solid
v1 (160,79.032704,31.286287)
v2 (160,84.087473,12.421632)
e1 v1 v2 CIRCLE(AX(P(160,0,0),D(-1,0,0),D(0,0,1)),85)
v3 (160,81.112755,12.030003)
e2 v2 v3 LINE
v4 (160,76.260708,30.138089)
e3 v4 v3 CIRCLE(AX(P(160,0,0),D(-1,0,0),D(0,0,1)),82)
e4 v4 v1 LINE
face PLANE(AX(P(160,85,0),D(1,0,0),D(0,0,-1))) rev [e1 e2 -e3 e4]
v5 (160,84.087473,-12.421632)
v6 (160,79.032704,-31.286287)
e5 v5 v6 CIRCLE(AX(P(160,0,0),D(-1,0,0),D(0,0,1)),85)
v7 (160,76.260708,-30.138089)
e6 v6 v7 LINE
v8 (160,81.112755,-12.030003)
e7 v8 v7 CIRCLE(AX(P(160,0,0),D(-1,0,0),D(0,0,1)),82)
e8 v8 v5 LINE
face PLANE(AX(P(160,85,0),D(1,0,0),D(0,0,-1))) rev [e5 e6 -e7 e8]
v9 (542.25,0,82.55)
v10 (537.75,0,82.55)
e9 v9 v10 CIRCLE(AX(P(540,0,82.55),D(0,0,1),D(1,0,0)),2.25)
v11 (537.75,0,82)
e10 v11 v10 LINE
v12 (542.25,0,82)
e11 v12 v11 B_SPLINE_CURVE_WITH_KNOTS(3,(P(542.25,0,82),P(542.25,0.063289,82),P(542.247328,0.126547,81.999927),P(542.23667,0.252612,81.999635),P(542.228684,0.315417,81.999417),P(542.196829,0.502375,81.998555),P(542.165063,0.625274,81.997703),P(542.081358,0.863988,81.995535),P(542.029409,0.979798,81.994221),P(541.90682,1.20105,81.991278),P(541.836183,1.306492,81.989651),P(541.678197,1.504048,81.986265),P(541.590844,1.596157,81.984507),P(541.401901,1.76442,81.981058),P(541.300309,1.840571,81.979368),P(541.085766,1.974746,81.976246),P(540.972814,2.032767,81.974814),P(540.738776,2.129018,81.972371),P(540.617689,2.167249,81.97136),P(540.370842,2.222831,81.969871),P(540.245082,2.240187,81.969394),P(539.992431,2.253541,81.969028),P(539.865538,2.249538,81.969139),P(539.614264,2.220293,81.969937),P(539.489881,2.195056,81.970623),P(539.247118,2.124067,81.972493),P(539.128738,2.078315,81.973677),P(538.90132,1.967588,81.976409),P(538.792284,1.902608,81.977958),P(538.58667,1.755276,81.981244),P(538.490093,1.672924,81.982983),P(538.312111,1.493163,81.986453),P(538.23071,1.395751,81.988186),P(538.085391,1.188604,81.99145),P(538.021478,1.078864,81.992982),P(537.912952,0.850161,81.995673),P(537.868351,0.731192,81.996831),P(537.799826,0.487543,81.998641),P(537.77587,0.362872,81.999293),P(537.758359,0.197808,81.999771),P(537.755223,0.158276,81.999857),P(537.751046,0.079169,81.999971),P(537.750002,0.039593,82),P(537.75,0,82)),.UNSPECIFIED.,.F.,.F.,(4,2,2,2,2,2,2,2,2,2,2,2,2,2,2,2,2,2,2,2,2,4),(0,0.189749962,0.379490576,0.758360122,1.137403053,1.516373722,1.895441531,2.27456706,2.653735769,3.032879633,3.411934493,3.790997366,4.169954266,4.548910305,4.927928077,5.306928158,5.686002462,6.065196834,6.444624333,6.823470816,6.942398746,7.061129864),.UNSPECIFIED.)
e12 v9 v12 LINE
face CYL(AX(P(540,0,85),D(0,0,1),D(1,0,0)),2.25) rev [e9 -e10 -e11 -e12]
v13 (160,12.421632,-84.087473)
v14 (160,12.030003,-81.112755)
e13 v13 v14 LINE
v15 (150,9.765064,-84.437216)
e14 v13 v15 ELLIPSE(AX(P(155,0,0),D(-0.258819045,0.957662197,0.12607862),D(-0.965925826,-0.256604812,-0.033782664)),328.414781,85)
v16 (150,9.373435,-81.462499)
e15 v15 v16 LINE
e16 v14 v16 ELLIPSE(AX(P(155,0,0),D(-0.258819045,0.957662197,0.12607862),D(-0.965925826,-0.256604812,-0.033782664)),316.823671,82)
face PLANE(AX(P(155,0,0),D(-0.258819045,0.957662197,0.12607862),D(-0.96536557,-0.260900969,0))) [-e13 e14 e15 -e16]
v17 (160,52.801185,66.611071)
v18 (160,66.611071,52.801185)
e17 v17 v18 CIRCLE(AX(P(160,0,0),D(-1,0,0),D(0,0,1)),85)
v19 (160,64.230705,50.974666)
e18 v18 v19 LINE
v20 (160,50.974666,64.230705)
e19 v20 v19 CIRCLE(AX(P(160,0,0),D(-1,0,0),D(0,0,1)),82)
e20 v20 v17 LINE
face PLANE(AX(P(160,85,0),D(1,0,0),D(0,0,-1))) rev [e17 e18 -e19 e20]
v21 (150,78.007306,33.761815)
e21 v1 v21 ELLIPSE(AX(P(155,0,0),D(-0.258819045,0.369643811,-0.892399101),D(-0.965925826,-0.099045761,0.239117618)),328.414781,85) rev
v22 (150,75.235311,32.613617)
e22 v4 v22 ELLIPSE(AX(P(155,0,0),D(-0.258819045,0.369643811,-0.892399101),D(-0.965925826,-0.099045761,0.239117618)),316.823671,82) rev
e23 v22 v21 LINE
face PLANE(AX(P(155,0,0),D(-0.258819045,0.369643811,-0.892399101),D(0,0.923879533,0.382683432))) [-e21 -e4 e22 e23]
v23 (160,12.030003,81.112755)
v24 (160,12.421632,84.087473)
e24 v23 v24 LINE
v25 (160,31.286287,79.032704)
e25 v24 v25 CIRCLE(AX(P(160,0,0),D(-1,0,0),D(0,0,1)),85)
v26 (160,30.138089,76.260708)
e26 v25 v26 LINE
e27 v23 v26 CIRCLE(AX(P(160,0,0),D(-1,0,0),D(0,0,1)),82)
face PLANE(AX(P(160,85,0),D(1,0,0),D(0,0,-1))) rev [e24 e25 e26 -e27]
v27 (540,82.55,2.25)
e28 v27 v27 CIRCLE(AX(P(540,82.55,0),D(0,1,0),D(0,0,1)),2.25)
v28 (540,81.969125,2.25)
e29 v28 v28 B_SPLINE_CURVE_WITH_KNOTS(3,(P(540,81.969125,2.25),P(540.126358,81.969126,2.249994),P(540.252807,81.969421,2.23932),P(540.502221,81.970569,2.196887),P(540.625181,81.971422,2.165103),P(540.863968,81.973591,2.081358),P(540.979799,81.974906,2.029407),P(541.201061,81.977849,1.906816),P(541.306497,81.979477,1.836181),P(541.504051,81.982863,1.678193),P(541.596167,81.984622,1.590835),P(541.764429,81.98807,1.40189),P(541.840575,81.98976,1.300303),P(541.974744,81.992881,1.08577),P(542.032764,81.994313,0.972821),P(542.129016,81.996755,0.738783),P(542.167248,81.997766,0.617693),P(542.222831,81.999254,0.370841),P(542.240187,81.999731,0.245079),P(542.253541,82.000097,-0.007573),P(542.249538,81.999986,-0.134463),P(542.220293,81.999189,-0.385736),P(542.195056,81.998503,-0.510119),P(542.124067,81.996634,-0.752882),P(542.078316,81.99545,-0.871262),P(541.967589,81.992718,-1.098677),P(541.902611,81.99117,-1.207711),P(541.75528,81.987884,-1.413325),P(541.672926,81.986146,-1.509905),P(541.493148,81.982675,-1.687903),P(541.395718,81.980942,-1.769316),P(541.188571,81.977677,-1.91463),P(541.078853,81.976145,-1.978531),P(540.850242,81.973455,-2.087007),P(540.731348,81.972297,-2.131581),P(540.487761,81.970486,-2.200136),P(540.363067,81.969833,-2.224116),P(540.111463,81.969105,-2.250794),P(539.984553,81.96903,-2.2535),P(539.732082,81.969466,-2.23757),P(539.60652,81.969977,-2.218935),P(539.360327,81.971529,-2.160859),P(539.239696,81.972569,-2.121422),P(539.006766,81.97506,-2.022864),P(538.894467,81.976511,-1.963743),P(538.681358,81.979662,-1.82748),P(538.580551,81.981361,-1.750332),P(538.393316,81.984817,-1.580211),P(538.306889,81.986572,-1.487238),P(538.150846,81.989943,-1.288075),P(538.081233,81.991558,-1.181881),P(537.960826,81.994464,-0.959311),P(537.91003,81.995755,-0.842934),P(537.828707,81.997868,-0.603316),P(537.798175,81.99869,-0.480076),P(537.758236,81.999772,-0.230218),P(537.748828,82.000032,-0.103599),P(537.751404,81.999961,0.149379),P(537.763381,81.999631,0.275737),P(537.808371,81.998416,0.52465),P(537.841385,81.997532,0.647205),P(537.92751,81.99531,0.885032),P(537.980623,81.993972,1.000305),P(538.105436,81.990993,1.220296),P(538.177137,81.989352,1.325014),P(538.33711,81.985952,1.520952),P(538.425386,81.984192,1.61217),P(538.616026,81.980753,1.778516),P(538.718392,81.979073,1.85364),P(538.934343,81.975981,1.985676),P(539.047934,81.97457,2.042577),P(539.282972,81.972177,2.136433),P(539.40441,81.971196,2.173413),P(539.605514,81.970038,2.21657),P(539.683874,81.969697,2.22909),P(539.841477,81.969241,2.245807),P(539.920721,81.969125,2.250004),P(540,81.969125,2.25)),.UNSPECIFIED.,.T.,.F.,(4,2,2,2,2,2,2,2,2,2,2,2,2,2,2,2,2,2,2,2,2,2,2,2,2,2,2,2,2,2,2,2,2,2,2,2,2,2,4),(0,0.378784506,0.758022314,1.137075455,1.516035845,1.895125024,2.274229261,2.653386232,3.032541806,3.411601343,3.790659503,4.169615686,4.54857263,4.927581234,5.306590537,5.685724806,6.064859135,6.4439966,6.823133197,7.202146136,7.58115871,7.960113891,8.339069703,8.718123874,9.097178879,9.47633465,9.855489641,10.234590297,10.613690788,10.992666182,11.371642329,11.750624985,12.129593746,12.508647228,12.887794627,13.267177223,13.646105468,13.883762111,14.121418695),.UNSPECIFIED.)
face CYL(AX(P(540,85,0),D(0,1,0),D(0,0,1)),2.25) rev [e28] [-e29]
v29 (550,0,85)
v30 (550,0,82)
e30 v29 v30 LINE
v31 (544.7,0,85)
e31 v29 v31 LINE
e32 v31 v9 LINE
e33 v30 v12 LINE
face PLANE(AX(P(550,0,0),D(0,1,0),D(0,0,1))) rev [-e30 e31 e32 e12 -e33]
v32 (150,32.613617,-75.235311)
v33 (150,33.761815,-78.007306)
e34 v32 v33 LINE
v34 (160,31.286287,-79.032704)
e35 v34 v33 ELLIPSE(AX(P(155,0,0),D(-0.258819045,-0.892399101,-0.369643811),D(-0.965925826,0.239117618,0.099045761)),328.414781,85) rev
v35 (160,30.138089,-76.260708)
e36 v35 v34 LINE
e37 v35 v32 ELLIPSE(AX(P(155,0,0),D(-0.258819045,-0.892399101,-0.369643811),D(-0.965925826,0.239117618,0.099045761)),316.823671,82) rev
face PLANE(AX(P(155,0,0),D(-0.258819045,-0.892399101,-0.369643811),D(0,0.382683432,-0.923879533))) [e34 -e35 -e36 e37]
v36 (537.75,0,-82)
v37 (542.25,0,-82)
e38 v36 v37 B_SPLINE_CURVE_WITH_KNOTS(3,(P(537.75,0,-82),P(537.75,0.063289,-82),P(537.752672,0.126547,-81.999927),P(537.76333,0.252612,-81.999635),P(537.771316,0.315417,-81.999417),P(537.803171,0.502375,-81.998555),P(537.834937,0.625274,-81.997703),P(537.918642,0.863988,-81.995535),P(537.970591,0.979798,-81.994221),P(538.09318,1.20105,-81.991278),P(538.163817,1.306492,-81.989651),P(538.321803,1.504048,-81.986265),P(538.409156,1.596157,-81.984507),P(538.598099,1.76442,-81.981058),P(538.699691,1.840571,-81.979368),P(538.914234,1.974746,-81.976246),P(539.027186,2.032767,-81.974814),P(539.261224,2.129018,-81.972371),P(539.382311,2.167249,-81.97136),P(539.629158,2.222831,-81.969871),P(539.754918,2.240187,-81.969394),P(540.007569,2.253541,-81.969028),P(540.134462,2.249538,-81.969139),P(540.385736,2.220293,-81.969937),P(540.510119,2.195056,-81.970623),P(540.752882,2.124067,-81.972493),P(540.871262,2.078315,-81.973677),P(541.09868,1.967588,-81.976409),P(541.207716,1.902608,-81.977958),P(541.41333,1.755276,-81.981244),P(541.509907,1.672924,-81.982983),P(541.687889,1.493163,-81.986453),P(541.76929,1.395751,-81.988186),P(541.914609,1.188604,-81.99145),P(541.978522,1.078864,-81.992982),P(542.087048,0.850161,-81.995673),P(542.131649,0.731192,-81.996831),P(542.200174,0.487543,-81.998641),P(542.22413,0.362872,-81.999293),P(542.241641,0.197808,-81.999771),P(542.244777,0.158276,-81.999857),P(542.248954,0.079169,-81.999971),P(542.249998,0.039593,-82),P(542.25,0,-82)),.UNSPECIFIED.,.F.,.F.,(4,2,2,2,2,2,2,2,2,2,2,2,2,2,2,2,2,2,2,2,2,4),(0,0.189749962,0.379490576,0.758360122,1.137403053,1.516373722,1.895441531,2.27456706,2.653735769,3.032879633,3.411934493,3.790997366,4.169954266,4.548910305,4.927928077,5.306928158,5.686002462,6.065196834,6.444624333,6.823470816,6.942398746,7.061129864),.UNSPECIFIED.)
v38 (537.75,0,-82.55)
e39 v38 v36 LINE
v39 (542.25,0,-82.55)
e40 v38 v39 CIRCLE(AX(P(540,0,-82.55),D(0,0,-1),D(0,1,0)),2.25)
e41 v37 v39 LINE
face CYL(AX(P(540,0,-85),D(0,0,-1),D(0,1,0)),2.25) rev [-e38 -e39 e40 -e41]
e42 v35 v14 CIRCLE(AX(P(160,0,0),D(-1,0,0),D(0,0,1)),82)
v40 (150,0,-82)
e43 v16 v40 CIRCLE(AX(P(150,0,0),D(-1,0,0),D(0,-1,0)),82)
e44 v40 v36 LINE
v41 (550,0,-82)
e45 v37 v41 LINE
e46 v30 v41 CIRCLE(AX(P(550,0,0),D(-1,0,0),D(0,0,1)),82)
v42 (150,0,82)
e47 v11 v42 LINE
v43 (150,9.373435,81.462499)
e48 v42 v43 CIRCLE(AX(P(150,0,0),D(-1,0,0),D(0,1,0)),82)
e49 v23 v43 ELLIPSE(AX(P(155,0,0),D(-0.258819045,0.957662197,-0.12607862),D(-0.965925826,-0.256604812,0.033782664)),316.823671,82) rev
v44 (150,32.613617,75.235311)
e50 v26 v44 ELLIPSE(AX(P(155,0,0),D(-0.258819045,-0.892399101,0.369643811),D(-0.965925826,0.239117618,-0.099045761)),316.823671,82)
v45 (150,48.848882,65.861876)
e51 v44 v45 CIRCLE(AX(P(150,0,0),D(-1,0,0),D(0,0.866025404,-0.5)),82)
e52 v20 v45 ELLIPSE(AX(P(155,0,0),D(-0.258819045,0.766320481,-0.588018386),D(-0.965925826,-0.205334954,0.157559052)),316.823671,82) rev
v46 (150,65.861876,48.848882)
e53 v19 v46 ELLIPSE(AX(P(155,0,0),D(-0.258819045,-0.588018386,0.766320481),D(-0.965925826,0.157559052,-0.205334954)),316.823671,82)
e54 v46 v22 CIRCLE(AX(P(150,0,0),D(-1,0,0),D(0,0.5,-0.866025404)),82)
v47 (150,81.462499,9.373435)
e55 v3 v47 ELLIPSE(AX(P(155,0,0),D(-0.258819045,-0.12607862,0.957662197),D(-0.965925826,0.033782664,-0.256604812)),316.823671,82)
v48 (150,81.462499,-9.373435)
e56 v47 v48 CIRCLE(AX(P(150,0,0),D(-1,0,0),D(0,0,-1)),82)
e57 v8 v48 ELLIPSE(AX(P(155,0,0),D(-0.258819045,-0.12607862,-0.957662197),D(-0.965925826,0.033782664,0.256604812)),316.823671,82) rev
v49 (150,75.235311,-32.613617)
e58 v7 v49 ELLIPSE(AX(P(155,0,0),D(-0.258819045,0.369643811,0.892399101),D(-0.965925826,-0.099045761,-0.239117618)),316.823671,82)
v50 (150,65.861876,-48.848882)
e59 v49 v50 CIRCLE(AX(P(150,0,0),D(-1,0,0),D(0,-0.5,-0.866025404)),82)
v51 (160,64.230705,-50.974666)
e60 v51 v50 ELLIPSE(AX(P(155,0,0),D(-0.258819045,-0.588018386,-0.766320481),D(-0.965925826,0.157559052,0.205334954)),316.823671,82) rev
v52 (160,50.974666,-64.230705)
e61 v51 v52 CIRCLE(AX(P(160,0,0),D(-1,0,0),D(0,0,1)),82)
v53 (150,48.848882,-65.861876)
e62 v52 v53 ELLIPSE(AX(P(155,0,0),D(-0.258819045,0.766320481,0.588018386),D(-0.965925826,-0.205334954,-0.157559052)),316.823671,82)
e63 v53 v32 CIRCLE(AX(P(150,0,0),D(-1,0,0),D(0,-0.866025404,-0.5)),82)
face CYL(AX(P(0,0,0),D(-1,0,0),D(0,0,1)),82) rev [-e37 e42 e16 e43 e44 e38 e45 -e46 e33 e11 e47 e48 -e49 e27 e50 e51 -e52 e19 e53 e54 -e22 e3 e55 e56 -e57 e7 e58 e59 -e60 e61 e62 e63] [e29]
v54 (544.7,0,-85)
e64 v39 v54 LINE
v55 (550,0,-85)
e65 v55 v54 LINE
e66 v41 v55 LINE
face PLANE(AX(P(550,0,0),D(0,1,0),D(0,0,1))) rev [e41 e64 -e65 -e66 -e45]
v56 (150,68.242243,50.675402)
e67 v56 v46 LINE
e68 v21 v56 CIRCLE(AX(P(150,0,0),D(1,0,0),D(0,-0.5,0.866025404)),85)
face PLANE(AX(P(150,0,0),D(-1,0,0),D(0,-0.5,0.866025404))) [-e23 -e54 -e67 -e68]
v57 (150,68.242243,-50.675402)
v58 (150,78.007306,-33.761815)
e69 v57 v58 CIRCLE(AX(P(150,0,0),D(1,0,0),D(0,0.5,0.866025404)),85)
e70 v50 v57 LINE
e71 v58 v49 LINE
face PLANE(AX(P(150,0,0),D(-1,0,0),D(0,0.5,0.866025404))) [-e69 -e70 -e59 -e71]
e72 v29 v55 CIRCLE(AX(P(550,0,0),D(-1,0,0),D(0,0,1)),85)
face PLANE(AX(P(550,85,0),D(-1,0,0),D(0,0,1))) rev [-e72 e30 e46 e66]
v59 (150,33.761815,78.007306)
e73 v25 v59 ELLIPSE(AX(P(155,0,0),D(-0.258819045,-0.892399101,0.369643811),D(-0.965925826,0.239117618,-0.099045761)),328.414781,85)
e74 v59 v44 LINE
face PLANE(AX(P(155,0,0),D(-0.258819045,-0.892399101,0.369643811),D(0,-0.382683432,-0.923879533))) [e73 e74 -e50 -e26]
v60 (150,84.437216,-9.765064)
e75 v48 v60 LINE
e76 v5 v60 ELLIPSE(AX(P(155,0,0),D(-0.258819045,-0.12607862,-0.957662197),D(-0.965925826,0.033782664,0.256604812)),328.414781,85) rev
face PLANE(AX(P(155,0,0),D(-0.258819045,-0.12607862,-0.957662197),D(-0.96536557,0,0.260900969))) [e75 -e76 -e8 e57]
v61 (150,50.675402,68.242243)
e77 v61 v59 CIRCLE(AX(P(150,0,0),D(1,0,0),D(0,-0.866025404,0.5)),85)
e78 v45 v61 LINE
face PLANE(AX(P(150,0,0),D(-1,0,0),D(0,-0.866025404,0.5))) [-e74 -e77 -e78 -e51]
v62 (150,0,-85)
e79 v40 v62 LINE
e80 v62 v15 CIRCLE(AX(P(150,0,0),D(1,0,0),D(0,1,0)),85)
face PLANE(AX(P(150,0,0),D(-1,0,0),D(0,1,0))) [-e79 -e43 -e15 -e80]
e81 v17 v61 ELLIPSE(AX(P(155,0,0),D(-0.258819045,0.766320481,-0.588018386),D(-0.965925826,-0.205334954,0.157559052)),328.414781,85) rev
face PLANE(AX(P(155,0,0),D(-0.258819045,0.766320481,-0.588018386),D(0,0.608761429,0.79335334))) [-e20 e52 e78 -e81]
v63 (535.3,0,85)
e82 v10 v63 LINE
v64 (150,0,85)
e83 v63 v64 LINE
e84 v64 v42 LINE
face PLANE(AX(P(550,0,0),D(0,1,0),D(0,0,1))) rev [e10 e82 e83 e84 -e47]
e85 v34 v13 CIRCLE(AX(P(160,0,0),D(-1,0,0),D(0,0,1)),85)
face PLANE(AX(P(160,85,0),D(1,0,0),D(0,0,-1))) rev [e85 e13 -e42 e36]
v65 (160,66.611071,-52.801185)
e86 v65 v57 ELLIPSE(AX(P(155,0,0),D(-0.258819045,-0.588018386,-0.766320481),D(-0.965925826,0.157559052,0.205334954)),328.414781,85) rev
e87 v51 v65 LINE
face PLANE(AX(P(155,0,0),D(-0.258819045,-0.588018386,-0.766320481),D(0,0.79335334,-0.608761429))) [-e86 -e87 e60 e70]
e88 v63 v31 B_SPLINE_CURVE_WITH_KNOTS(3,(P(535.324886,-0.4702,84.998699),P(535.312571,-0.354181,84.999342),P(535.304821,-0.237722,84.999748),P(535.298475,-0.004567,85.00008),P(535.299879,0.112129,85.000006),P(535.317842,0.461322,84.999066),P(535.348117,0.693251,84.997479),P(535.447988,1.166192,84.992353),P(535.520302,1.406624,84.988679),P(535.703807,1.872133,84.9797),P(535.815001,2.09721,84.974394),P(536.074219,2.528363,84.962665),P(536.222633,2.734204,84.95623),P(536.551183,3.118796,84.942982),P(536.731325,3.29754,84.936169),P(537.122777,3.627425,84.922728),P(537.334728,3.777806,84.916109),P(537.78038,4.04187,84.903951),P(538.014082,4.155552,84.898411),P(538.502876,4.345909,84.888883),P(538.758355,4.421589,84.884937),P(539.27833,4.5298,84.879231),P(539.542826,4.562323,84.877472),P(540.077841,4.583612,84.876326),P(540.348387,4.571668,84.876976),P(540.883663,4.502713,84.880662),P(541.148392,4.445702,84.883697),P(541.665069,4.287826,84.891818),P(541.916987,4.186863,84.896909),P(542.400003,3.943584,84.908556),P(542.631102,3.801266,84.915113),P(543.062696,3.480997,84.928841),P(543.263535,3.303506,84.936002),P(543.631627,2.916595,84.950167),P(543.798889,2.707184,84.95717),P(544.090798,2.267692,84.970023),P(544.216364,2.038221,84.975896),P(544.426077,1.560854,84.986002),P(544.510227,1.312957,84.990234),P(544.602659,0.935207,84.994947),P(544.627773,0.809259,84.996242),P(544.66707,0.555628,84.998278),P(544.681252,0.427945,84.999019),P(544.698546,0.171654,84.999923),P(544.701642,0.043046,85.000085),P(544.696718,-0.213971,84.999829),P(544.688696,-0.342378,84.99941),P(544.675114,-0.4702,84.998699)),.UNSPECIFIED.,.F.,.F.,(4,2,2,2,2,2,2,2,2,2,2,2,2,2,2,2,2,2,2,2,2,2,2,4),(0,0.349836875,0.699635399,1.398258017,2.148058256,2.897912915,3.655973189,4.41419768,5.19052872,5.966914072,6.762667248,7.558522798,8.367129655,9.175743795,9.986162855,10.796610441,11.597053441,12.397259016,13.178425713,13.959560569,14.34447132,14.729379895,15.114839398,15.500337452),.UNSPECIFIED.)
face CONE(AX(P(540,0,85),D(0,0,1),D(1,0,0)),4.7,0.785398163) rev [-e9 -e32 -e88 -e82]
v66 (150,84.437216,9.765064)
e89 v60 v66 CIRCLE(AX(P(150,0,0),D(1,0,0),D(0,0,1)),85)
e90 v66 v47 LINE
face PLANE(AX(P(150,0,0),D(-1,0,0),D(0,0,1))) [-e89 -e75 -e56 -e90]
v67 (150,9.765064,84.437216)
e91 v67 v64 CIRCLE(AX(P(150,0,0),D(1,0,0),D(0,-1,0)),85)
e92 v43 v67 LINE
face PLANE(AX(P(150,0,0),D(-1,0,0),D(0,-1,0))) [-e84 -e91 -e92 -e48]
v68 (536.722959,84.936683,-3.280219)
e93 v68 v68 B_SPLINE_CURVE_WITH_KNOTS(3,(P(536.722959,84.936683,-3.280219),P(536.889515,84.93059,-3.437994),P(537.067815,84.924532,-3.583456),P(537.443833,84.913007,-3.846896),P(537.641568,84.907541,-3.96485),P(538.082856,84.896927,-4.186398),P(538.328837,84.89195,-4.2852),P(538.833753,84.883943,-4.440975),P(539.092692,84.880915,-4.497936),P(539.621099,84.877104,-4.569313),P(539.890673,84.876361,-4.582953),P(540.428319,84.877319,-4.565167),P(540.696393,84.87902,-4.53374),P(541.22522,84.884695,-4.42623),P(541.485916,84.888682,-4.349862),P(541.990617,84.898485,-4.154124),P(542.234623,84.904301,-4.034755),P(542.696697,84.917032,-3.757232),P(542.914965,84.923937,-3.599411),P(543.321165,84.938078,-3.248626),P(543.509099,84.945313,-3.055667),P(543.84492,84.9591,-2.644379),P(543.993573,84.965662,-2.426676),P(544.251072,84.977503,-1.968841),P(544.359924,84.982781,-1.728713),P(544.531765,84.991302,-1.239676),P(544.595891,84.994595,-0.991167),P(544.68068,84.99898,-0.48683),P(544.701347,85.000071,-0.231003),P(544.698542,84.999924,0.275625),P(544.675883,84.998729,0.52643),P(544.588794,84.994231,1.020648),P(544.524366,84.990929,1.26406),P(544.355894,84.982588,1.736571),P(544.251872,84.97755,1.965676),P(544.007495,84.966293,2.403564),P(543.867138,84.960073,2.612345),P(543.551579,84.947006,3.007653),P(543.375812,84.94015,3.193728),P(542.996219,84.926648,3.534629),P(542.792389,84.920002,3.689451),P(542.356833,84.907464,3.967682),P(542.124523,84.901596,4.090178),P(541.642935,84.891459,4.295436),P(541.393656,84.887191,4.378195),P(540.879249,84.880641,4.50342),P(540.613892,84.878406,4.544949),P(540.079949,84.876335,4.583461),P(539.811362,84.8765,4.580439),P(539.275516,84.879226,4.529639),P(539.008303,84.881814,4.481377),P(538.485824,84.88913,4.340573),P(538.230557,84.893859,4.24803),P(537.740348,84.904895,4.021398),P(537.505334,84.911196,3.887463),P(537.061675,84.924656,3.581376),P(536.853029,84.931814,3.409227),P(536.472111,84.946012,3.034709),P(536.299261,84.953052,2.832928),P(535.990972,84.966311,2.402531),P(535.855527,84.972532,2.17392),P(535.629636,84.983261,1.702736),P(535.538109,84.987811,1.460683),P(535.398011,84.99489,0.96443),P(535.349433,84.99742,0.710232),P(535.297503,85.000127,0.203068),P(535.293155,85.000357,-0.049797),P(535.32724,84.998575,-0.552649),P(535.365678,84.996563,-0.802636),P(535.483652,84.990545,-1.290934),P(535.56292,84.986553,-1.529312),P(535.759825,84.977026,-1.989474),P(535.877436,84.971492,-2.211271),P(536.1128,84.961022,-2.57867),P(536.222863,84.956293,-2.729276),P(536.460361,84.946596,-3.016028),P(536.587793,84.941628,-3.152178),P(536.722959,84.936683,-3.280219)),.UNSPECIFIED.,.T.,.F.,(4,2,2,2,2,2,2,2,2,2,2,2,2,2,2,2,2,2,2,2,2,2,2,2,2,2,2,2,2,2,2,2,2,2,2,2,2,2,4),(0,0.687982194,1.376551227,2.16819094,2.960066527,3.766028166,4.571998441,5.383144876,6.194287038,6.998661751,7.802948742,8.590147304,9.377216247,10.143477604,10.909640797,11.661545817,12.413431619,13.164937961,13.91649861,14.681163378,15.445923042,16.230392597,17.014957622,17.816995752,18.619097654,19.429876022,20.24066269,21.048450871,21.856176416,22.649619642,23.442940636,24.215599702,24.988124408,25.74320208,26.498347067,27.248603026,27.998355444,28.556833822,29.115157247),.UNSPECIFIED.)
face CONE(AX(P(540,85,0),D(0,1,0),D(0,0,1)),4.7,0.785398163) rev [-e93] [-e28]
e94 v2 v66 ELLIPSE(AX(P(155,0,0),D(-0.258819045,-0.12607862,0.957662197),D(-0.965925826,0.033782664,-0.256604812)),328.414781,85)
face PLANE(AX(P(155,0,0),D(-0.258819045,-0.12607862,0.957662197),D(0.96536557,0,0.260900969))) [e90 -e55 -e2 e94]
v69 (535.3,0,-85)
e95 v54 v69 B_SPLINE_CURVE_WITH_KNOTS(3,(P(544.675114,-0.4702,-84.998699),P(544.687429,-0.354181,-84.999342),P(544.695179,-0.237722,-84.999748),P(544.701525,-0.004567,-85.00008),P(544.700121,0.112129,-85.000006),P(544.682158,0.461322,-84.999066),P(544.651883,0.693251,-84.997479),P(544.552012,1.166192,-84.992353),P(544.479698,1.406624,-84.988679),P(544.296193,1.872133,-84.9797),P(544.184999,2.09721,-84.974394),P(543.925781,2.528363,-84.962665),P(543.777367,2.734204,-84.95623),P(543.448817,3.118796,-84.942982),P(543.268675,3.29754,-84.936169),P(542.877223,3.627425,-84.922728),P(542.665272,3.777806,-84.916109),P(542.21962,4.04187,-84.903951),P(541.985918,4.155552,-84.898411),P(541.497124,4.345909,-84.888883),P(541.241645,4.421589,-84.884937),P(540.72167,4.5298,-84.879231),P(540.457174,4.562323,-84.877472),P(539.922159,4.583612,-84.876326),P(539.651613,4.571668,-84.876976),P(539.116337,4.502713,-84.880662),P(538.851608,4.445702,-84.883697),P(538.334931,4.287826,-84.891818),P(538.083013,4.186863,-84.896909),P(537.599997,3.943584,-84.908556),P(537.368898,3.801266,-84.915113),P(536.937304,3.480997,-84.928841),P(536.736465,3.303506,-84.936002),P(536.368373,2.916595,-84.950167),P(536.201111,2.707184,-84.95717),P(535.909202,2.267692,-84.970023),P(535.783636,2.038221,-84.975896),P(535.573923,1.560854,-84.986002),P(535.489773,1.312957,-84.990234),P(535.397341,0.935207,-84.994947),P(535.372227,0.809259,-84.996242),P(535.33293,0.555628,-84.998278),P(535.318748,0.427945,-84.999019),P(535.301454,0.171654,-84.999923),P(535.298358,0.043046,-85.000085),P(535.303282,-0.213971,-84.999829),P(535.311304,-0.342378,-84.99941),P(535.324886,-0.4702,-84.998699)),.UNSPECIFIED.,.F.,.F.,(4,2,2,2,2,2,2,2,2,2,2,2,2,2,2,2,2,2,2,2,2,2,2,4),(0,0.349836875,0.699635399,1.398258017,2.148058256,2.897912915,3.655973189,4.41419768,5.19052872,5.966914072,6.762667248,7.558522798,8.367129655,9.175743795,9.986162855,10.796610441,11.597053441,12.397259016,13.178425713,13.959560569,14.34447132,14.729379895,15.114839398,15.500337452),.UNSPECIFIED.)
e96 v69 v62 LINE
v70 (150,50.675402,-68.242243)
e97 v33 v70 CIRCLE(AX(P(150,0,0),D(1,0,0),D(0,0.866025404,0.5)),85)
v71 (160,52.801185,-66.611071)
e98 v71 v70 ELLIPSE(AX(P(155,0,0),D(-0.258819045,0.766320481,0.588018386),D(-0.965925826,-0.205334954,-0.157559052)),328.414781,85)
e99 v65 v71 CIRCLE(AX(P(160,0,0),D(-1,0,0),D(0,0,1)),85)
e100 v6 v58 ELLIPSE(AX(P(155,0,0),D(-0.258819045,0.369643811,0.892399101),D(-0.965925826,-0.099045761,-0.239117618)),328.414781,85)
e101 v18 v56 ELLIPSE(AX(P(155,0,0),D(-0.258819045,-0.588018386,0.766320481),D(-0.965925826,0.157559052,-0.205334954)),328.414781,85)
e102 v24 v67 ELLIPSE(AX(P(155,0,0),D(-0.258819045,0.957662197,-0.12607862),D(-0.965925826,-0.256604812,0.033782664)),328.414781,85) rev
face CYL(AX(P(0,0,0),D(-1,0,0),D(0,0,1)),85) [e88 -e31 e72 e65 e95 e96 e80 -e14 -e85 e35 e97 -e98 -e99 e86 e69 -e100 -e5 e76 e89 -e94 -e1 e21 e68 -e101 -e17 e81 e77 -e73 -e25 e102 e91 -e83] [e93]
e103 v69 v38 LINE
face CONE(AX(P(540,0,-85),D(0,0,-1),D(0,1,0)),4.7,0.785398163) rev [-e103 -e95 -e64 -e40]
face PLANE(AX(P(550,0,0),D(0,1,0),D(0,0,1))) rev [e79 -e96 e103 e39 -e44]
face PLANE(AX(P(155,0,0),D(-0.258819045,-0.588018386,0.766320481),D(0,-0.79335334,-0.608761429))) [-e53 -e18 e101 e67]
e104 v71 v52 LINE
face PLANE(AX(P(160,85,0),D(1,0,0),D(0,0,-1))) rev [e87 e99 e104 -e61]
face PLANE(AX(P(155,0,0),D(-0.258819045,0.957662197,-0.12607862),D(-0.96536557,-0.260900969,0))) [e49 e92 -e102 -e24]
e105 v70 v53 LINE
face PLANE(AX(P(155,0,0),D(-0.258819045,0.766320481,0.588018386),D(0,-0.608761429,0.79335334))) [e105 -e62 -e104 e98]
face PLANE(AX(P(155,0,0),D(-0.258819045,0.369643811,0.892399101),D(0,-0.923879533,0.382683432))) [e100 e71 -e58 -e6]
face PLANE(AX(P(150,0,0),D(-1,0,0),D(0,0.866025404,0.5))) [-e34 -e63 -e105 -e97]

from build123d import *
from build123d.topology import SkipClean

# Parameters (mm, degrees)
SKETCH1_W                      = 390
SKETCH1_H                      = 3
BOSS_EXTRUDE1_DEPTH            = 5
DRAFT1_ANGLE                   = -15
CIRPATTERN1_COUNT              = 12
DRAFT1_OF_CIRPATTERN1_2_ANGLE  = -15
DRAFT1_OF_CIRPATTERN1_3_ANGLE  = -15
DRAFT1_OF_CIRPATTERN1_4_ANGLE  = -15
DRAFT1_OF_CIRPATTERN1_5_ANGLE  = -15
DRAFT1_OF_CIRPATTERN1_6_ANGLE  = -15
DRAFT1_OF_CIRPATTERN1_7_ANGLE  = -15
DRAFT1_OF_CIRPATTERN1_8_ANGLE  = -15
DRAFT1_OF_CIRPATTERN1_9_ANGLE  = -15
DRAFT1_OF_CIRPATTERN1_10_ANGLE = -15
DRAFT1_OF_CIRPATTERN1_11_ANGLE = -15
DRAFT1_OF_CIRPATTERN1_12_ANGLE = -15
SKETCH3_OUTSIDE_W              = 265.338
SKETCH3_OUTSIDE_H              = 265.338
CUT_EXTRUDE1_DEPTH             = 563.983125857


# Read off the part's stored shape, not the designer's step: CSK for M4 Countersunk Flat Head Screw1
with BuildPart() as part:
    # Sketch1 → Revolve1 (revolve)
    with BuildSketch(Plane.XY, mode=Mode.PRIVATE) as revolve1_sk:
        with Locations((355, 83.5)):
            Rectangle(SKETCH1_W, SKETCH1_H)
    revolve(revolve1_sk.sketch.rotate(Axis((0, 0, 0), (1, 0, 0)), 90), axis=Axis((0, 0, 0), (1, 0, 0)))

    # Sketch2 → Boss-Extrude1 (add, symmetric)
    with BuildSketch(Plane(origin=(155, 0, 0), x_dir=(0, 0, -1), z_dir=(1, 0, 0))):
        with BuildLine():
            Line((10.703147762, 81.298478633), (11.094726339, 84.272813217))
            ThreePointArc((11.094726339, 84.272813217), (0, 85), (-11.094726339, 84.272813217))
            Line((-11.094726339, 84.272813217), (-10.703147762, 81.298478633))
            ThreePointArc((-10.703147762, 81.298478633), (0, 82), (10.703147762, 81.298478633))
        make_face()
    boss_extrude1 = extrude(amount=BOSS_EXTRUDE1_DEPTH, both=True)

    # Draft1
    draft1_faces = [part.faces().sort_by_distance(p)[0] for p in [
        (155, 82.785645925, 10.89893705),
        (155, 82.785645925, -10.89893705),
    ]]
    draft(draft1_faces, Plane(origin=(155, 0, 0), x_dir=(0, 0, 1), z_dir=(1, 0, 0)), DRAFT1_ANGLE)

    # CirPattern1: Boss-Extrude1 ×12 about axis
    with SkipClean():  # the faces are left unmerged after this step: merging them gives an invalid solid
        cirpattern1_axis = Axis((0, 0, 0), (1, 0, 0))
        for i in range(1, CIRPATTERN1_COUNT):
            add(boss_extrude1.rotate(cirpattern1_axis, i * 360 / CIRPATTERN1_COUNT))

    # Draft1 of CirPattern1 2
    draft1_of_cirpattern1_2_faces = [part.faces().sort_by_distance(p)[0] for p in [
        (155, 66.245003914, 50.831579322),
        (155, 77.143940965, 31.954066602),
    ]]
    draft(draft1_of_cirpattern1_2_faces, Plane(origin=(155, 0, 0), x_dir=(0, -0.49999999999999994, 0.8660254037844387), z_dir=(1, 0, 0)), DRAFT1_OF_CIRPATTERN1_2_ANGLE)

    # Draft1 of CirPattern1 3
    draft1_of_cirpattern1_3_faces = [part.faces().sort_by_distance(p)[0] for p in [
        (155, 31.954066602, 77.143940965),
        (155, 50.831579322, 66.245003914),
    ]]
    draft(draft1_of_cirpattern1_3_faces, Plane(origin=(155, 0, 0), x_dir=(0, -0.8660254037844386, 0.5000000000000001), z_dir=(1, 0, 0)), DRAFT1_OF_CIRPATTERN1_3_ANGLE)

    # Draft1 of CirPattern1 4
    draft1_of_cirpattern1_4_faces = [part.faces().sort_by_distance(p)[0] for p in [
        (155, -10.89893705, 82.785645925),
        (155, 10.89893705, 82.785645925),
    ]]
    draft(draft1_of_cirpattern1_4_faces, Plane(origin=(155, 0, 0), x_dir=(0, -1, 0), z_dir=(1, 0, 0)), DRAFT1_OF_CIRPATTERN1_4_ANGLE)

    # Draft1 of CirPattern1 5
    draft1_of_cirpattern1_5_faces = [part.faces().sort_by_distance(p)[0] for p in [
        (155, -50.831579322, 66.245003914),
        (155, -31.954066602, 77.143940965),
    ]]
    draft(draft1_of_cirpattern1_5_faces, Plane(origin=(155, 0, 0), x_dir=(0, -0.8660254037844387, -0.4999999999999998), z_dir=(1, 0, 0)), DRAFT1_OF_CIRPATTERN1_5_ANGLE)

    # Draft1 of CirPattern1 6
    draft1_of_cirpattern1_6_faces = [part.faces().sort_by_distance(p)[0] for p in [
        (155, -77.143940965, 31.954066602),
        (155, -66.245003914, 50.831579322),
    ]]
    draft(draft1_of_cirpattern1_6_faces, Plane(origin=(155, 0, 0), x_dir=(0, -0.49999999999999994, -0.8660254037844387), z_dir=(1, 0, 0)), DRAFT1_OF_CIRPATTERN1_6_ANGLE)

    # Draft1 of CirPattern1 7
    draft1_of_cirpattern1_7_faces = [part.faces().sort_by_distance(p)[0] for p in [
        (155, -82.785645925, -10.89893705),
        (155, -82.785645925, 10.89893705),
    ]]
    draft(draft1_of_cirpattern1_7_faces, Plane(origin=(155, 0, 0), x_dir=(0, 0, -1), z_dir=(1, 0, 0)), DRAFT1_OF_CIRPATTERN1_7_ANGLE)

    # Draft1 of CirPattern1 8
    draft1_of_cirpattern1_8_faces = [part.faces().sort_by_distance(p)[0] for p in [
        (155, -66.245003914, -50.831579322),
        (155, -77.143940965, -31.954066602),
    ]]
    draft(draft1_of_cirpattern1_8_faces, Plane(origin=(155, 0, 0), x_dir=(0, 0.5000000000000001, -0.8660254037844386), z_dir=(1, 0, 0)), DRAFT1_OF_CIRPATTERN1_8_ANGLE)

    # Draft1 of CirPattern1 9
    draft1_of_cirpattern1_9_faces = [part.faces().sort_by_distance(p)[0] for p in [
        (155, -31.954066602, -77.143940965),
        (155, -50.831579322, -66.245003914),
    ]]
    draft(draft1_of_cirpattern1_9_faces, Plane(origin=(155, 0, 0), x_dir=(0, 0.8660254037844384, -0.5000000000000004), z_dir=(1, 0, 0)), DRAFT1_OF_CIRPATTERN1_9_ANGLE)

    # Draft1 of CirPattern1 10
    draft1_of_cirpattern1_10_faces = [part.faces().sort_by_distance(p)[0] for p in [
        (155, 10.89893705, -82.785645925),
        (155, -10.89893705, -82.785645925),
    ]]
    draft(draft1_of_cirpattern1_10_faces, Plane.YZ.offset(155), DRAFT1_OF_CIRPATTERN1_10_ANGLE)

    # Draft1 of CirPattern1 11
    draft1_of_cirpattern1_11_faces = [part.faces().sort_by_distance(p)[0] for p in [
        (155, 50.831579322, -66.245003914),
        (155, 31.954066602, -77.143940965),
    ]]
    draft(draft1_of_cirpattern1_11_faces, Plane(origin=(155, 0, 0), x_dir=(0, 0.8660254037844386, 0.5000000000000001), z_dir=(1, 0, 0)), DRAFT1_OF_CIRPATTERN1_11_ANGLE)

    # Draft1 of CirPattern1 12
    draft1_of_cirpattern1_12_faces = [part.faces().sort_by_distance(p)[0] for p in [
        (155, 77.143940965, -31.954066602),
        (155, 66.245003914, -50.831579322),
    ]]
    draft(draft1_of_cirpattern1_12_faces, Plane(origin=(155, 0, 0), x_dir=(0, 0.5000000000000004, 0.8660254037844384), z_dir=(1, 0, 0)), DRAFT1_OF_CIRPATTERN1_12_ANGLE)

    # Sketch3 outside → Cut-Extrude1 (cut, through all)
    with SkipClean():  # the faces are left unmerged after this step: merging them gives an invalid solid
        with BuildSketch(Plane(origin=(0, 0, 0), x_dir=(0, 0, -1), z_dir=(1, 0, 0))):
            Rectangle(SKETCH3_OUTSIDE_W, SKETCH3_OUTSIDE_H)
            with BuildLine():
                Line((0, 0), (-85, 0))
                ThreePointArc((-85, 0), (0, 85), (85, 0))
                Line((85, 0), (0, 0))
            make_face(mode=Mode.SUBTRACT)
        extrude(amount=CUT_EXTRUDE1_DEPTH, mode=Mode.SUBTRACT)

    # CSK for M4 Countersunk Flat Head Scr 2 → CSK for M4 Countersunk Flat Head Screw1 (revolve, cut)
    with SkipClean():  # the faces are left unmerged after this step: merging them gives an invalid solid
        with BuildSketch(Plane(origin=(540, 0, 0), x_dir=(1, 0, 0), z_dir=(0, 0, 1))):
            Polygon((4.700033545, 85.000033545), (0, 85.000033545), (0, 81.96910869), (2.25, 81.96910869), (2.25, 82.55), align=None)
        revolve(axis=Axis((540, 0, 0), (0, 1, 0)), mode=Mode.SUBTRACT)

    # CSK for M4 Countersunk Flat Head Scr 3 o → CSK for M4 Countersunk Flat Head Scr 3 (revolve, cut)
    with SkipClean():  # the faces are left unmerged after this step: merging them gives an invalid solid
        with BuildSketch(Plane(origin=(540, 0, 0), x_dir=(1, 0, 0), z_dir=(0, -1, 0))):
            Polygon((0, -85.000002015), (4.700002015, -85.000002015), (2.25, -82.55), (2.25, -81.969112603), (0, -81.969112603), align=None)
            Polygon((0, 81.969112603), (2.25, 81.969112603), (2.25, 82.55), (4.700002015, 85.000002015), (0, 85.000002015), align=None)
        revolve(axis=Axis((540, 0, 0), (0, 0, 1)), mode=Mode.SUBTRACT)


solid = part.part
